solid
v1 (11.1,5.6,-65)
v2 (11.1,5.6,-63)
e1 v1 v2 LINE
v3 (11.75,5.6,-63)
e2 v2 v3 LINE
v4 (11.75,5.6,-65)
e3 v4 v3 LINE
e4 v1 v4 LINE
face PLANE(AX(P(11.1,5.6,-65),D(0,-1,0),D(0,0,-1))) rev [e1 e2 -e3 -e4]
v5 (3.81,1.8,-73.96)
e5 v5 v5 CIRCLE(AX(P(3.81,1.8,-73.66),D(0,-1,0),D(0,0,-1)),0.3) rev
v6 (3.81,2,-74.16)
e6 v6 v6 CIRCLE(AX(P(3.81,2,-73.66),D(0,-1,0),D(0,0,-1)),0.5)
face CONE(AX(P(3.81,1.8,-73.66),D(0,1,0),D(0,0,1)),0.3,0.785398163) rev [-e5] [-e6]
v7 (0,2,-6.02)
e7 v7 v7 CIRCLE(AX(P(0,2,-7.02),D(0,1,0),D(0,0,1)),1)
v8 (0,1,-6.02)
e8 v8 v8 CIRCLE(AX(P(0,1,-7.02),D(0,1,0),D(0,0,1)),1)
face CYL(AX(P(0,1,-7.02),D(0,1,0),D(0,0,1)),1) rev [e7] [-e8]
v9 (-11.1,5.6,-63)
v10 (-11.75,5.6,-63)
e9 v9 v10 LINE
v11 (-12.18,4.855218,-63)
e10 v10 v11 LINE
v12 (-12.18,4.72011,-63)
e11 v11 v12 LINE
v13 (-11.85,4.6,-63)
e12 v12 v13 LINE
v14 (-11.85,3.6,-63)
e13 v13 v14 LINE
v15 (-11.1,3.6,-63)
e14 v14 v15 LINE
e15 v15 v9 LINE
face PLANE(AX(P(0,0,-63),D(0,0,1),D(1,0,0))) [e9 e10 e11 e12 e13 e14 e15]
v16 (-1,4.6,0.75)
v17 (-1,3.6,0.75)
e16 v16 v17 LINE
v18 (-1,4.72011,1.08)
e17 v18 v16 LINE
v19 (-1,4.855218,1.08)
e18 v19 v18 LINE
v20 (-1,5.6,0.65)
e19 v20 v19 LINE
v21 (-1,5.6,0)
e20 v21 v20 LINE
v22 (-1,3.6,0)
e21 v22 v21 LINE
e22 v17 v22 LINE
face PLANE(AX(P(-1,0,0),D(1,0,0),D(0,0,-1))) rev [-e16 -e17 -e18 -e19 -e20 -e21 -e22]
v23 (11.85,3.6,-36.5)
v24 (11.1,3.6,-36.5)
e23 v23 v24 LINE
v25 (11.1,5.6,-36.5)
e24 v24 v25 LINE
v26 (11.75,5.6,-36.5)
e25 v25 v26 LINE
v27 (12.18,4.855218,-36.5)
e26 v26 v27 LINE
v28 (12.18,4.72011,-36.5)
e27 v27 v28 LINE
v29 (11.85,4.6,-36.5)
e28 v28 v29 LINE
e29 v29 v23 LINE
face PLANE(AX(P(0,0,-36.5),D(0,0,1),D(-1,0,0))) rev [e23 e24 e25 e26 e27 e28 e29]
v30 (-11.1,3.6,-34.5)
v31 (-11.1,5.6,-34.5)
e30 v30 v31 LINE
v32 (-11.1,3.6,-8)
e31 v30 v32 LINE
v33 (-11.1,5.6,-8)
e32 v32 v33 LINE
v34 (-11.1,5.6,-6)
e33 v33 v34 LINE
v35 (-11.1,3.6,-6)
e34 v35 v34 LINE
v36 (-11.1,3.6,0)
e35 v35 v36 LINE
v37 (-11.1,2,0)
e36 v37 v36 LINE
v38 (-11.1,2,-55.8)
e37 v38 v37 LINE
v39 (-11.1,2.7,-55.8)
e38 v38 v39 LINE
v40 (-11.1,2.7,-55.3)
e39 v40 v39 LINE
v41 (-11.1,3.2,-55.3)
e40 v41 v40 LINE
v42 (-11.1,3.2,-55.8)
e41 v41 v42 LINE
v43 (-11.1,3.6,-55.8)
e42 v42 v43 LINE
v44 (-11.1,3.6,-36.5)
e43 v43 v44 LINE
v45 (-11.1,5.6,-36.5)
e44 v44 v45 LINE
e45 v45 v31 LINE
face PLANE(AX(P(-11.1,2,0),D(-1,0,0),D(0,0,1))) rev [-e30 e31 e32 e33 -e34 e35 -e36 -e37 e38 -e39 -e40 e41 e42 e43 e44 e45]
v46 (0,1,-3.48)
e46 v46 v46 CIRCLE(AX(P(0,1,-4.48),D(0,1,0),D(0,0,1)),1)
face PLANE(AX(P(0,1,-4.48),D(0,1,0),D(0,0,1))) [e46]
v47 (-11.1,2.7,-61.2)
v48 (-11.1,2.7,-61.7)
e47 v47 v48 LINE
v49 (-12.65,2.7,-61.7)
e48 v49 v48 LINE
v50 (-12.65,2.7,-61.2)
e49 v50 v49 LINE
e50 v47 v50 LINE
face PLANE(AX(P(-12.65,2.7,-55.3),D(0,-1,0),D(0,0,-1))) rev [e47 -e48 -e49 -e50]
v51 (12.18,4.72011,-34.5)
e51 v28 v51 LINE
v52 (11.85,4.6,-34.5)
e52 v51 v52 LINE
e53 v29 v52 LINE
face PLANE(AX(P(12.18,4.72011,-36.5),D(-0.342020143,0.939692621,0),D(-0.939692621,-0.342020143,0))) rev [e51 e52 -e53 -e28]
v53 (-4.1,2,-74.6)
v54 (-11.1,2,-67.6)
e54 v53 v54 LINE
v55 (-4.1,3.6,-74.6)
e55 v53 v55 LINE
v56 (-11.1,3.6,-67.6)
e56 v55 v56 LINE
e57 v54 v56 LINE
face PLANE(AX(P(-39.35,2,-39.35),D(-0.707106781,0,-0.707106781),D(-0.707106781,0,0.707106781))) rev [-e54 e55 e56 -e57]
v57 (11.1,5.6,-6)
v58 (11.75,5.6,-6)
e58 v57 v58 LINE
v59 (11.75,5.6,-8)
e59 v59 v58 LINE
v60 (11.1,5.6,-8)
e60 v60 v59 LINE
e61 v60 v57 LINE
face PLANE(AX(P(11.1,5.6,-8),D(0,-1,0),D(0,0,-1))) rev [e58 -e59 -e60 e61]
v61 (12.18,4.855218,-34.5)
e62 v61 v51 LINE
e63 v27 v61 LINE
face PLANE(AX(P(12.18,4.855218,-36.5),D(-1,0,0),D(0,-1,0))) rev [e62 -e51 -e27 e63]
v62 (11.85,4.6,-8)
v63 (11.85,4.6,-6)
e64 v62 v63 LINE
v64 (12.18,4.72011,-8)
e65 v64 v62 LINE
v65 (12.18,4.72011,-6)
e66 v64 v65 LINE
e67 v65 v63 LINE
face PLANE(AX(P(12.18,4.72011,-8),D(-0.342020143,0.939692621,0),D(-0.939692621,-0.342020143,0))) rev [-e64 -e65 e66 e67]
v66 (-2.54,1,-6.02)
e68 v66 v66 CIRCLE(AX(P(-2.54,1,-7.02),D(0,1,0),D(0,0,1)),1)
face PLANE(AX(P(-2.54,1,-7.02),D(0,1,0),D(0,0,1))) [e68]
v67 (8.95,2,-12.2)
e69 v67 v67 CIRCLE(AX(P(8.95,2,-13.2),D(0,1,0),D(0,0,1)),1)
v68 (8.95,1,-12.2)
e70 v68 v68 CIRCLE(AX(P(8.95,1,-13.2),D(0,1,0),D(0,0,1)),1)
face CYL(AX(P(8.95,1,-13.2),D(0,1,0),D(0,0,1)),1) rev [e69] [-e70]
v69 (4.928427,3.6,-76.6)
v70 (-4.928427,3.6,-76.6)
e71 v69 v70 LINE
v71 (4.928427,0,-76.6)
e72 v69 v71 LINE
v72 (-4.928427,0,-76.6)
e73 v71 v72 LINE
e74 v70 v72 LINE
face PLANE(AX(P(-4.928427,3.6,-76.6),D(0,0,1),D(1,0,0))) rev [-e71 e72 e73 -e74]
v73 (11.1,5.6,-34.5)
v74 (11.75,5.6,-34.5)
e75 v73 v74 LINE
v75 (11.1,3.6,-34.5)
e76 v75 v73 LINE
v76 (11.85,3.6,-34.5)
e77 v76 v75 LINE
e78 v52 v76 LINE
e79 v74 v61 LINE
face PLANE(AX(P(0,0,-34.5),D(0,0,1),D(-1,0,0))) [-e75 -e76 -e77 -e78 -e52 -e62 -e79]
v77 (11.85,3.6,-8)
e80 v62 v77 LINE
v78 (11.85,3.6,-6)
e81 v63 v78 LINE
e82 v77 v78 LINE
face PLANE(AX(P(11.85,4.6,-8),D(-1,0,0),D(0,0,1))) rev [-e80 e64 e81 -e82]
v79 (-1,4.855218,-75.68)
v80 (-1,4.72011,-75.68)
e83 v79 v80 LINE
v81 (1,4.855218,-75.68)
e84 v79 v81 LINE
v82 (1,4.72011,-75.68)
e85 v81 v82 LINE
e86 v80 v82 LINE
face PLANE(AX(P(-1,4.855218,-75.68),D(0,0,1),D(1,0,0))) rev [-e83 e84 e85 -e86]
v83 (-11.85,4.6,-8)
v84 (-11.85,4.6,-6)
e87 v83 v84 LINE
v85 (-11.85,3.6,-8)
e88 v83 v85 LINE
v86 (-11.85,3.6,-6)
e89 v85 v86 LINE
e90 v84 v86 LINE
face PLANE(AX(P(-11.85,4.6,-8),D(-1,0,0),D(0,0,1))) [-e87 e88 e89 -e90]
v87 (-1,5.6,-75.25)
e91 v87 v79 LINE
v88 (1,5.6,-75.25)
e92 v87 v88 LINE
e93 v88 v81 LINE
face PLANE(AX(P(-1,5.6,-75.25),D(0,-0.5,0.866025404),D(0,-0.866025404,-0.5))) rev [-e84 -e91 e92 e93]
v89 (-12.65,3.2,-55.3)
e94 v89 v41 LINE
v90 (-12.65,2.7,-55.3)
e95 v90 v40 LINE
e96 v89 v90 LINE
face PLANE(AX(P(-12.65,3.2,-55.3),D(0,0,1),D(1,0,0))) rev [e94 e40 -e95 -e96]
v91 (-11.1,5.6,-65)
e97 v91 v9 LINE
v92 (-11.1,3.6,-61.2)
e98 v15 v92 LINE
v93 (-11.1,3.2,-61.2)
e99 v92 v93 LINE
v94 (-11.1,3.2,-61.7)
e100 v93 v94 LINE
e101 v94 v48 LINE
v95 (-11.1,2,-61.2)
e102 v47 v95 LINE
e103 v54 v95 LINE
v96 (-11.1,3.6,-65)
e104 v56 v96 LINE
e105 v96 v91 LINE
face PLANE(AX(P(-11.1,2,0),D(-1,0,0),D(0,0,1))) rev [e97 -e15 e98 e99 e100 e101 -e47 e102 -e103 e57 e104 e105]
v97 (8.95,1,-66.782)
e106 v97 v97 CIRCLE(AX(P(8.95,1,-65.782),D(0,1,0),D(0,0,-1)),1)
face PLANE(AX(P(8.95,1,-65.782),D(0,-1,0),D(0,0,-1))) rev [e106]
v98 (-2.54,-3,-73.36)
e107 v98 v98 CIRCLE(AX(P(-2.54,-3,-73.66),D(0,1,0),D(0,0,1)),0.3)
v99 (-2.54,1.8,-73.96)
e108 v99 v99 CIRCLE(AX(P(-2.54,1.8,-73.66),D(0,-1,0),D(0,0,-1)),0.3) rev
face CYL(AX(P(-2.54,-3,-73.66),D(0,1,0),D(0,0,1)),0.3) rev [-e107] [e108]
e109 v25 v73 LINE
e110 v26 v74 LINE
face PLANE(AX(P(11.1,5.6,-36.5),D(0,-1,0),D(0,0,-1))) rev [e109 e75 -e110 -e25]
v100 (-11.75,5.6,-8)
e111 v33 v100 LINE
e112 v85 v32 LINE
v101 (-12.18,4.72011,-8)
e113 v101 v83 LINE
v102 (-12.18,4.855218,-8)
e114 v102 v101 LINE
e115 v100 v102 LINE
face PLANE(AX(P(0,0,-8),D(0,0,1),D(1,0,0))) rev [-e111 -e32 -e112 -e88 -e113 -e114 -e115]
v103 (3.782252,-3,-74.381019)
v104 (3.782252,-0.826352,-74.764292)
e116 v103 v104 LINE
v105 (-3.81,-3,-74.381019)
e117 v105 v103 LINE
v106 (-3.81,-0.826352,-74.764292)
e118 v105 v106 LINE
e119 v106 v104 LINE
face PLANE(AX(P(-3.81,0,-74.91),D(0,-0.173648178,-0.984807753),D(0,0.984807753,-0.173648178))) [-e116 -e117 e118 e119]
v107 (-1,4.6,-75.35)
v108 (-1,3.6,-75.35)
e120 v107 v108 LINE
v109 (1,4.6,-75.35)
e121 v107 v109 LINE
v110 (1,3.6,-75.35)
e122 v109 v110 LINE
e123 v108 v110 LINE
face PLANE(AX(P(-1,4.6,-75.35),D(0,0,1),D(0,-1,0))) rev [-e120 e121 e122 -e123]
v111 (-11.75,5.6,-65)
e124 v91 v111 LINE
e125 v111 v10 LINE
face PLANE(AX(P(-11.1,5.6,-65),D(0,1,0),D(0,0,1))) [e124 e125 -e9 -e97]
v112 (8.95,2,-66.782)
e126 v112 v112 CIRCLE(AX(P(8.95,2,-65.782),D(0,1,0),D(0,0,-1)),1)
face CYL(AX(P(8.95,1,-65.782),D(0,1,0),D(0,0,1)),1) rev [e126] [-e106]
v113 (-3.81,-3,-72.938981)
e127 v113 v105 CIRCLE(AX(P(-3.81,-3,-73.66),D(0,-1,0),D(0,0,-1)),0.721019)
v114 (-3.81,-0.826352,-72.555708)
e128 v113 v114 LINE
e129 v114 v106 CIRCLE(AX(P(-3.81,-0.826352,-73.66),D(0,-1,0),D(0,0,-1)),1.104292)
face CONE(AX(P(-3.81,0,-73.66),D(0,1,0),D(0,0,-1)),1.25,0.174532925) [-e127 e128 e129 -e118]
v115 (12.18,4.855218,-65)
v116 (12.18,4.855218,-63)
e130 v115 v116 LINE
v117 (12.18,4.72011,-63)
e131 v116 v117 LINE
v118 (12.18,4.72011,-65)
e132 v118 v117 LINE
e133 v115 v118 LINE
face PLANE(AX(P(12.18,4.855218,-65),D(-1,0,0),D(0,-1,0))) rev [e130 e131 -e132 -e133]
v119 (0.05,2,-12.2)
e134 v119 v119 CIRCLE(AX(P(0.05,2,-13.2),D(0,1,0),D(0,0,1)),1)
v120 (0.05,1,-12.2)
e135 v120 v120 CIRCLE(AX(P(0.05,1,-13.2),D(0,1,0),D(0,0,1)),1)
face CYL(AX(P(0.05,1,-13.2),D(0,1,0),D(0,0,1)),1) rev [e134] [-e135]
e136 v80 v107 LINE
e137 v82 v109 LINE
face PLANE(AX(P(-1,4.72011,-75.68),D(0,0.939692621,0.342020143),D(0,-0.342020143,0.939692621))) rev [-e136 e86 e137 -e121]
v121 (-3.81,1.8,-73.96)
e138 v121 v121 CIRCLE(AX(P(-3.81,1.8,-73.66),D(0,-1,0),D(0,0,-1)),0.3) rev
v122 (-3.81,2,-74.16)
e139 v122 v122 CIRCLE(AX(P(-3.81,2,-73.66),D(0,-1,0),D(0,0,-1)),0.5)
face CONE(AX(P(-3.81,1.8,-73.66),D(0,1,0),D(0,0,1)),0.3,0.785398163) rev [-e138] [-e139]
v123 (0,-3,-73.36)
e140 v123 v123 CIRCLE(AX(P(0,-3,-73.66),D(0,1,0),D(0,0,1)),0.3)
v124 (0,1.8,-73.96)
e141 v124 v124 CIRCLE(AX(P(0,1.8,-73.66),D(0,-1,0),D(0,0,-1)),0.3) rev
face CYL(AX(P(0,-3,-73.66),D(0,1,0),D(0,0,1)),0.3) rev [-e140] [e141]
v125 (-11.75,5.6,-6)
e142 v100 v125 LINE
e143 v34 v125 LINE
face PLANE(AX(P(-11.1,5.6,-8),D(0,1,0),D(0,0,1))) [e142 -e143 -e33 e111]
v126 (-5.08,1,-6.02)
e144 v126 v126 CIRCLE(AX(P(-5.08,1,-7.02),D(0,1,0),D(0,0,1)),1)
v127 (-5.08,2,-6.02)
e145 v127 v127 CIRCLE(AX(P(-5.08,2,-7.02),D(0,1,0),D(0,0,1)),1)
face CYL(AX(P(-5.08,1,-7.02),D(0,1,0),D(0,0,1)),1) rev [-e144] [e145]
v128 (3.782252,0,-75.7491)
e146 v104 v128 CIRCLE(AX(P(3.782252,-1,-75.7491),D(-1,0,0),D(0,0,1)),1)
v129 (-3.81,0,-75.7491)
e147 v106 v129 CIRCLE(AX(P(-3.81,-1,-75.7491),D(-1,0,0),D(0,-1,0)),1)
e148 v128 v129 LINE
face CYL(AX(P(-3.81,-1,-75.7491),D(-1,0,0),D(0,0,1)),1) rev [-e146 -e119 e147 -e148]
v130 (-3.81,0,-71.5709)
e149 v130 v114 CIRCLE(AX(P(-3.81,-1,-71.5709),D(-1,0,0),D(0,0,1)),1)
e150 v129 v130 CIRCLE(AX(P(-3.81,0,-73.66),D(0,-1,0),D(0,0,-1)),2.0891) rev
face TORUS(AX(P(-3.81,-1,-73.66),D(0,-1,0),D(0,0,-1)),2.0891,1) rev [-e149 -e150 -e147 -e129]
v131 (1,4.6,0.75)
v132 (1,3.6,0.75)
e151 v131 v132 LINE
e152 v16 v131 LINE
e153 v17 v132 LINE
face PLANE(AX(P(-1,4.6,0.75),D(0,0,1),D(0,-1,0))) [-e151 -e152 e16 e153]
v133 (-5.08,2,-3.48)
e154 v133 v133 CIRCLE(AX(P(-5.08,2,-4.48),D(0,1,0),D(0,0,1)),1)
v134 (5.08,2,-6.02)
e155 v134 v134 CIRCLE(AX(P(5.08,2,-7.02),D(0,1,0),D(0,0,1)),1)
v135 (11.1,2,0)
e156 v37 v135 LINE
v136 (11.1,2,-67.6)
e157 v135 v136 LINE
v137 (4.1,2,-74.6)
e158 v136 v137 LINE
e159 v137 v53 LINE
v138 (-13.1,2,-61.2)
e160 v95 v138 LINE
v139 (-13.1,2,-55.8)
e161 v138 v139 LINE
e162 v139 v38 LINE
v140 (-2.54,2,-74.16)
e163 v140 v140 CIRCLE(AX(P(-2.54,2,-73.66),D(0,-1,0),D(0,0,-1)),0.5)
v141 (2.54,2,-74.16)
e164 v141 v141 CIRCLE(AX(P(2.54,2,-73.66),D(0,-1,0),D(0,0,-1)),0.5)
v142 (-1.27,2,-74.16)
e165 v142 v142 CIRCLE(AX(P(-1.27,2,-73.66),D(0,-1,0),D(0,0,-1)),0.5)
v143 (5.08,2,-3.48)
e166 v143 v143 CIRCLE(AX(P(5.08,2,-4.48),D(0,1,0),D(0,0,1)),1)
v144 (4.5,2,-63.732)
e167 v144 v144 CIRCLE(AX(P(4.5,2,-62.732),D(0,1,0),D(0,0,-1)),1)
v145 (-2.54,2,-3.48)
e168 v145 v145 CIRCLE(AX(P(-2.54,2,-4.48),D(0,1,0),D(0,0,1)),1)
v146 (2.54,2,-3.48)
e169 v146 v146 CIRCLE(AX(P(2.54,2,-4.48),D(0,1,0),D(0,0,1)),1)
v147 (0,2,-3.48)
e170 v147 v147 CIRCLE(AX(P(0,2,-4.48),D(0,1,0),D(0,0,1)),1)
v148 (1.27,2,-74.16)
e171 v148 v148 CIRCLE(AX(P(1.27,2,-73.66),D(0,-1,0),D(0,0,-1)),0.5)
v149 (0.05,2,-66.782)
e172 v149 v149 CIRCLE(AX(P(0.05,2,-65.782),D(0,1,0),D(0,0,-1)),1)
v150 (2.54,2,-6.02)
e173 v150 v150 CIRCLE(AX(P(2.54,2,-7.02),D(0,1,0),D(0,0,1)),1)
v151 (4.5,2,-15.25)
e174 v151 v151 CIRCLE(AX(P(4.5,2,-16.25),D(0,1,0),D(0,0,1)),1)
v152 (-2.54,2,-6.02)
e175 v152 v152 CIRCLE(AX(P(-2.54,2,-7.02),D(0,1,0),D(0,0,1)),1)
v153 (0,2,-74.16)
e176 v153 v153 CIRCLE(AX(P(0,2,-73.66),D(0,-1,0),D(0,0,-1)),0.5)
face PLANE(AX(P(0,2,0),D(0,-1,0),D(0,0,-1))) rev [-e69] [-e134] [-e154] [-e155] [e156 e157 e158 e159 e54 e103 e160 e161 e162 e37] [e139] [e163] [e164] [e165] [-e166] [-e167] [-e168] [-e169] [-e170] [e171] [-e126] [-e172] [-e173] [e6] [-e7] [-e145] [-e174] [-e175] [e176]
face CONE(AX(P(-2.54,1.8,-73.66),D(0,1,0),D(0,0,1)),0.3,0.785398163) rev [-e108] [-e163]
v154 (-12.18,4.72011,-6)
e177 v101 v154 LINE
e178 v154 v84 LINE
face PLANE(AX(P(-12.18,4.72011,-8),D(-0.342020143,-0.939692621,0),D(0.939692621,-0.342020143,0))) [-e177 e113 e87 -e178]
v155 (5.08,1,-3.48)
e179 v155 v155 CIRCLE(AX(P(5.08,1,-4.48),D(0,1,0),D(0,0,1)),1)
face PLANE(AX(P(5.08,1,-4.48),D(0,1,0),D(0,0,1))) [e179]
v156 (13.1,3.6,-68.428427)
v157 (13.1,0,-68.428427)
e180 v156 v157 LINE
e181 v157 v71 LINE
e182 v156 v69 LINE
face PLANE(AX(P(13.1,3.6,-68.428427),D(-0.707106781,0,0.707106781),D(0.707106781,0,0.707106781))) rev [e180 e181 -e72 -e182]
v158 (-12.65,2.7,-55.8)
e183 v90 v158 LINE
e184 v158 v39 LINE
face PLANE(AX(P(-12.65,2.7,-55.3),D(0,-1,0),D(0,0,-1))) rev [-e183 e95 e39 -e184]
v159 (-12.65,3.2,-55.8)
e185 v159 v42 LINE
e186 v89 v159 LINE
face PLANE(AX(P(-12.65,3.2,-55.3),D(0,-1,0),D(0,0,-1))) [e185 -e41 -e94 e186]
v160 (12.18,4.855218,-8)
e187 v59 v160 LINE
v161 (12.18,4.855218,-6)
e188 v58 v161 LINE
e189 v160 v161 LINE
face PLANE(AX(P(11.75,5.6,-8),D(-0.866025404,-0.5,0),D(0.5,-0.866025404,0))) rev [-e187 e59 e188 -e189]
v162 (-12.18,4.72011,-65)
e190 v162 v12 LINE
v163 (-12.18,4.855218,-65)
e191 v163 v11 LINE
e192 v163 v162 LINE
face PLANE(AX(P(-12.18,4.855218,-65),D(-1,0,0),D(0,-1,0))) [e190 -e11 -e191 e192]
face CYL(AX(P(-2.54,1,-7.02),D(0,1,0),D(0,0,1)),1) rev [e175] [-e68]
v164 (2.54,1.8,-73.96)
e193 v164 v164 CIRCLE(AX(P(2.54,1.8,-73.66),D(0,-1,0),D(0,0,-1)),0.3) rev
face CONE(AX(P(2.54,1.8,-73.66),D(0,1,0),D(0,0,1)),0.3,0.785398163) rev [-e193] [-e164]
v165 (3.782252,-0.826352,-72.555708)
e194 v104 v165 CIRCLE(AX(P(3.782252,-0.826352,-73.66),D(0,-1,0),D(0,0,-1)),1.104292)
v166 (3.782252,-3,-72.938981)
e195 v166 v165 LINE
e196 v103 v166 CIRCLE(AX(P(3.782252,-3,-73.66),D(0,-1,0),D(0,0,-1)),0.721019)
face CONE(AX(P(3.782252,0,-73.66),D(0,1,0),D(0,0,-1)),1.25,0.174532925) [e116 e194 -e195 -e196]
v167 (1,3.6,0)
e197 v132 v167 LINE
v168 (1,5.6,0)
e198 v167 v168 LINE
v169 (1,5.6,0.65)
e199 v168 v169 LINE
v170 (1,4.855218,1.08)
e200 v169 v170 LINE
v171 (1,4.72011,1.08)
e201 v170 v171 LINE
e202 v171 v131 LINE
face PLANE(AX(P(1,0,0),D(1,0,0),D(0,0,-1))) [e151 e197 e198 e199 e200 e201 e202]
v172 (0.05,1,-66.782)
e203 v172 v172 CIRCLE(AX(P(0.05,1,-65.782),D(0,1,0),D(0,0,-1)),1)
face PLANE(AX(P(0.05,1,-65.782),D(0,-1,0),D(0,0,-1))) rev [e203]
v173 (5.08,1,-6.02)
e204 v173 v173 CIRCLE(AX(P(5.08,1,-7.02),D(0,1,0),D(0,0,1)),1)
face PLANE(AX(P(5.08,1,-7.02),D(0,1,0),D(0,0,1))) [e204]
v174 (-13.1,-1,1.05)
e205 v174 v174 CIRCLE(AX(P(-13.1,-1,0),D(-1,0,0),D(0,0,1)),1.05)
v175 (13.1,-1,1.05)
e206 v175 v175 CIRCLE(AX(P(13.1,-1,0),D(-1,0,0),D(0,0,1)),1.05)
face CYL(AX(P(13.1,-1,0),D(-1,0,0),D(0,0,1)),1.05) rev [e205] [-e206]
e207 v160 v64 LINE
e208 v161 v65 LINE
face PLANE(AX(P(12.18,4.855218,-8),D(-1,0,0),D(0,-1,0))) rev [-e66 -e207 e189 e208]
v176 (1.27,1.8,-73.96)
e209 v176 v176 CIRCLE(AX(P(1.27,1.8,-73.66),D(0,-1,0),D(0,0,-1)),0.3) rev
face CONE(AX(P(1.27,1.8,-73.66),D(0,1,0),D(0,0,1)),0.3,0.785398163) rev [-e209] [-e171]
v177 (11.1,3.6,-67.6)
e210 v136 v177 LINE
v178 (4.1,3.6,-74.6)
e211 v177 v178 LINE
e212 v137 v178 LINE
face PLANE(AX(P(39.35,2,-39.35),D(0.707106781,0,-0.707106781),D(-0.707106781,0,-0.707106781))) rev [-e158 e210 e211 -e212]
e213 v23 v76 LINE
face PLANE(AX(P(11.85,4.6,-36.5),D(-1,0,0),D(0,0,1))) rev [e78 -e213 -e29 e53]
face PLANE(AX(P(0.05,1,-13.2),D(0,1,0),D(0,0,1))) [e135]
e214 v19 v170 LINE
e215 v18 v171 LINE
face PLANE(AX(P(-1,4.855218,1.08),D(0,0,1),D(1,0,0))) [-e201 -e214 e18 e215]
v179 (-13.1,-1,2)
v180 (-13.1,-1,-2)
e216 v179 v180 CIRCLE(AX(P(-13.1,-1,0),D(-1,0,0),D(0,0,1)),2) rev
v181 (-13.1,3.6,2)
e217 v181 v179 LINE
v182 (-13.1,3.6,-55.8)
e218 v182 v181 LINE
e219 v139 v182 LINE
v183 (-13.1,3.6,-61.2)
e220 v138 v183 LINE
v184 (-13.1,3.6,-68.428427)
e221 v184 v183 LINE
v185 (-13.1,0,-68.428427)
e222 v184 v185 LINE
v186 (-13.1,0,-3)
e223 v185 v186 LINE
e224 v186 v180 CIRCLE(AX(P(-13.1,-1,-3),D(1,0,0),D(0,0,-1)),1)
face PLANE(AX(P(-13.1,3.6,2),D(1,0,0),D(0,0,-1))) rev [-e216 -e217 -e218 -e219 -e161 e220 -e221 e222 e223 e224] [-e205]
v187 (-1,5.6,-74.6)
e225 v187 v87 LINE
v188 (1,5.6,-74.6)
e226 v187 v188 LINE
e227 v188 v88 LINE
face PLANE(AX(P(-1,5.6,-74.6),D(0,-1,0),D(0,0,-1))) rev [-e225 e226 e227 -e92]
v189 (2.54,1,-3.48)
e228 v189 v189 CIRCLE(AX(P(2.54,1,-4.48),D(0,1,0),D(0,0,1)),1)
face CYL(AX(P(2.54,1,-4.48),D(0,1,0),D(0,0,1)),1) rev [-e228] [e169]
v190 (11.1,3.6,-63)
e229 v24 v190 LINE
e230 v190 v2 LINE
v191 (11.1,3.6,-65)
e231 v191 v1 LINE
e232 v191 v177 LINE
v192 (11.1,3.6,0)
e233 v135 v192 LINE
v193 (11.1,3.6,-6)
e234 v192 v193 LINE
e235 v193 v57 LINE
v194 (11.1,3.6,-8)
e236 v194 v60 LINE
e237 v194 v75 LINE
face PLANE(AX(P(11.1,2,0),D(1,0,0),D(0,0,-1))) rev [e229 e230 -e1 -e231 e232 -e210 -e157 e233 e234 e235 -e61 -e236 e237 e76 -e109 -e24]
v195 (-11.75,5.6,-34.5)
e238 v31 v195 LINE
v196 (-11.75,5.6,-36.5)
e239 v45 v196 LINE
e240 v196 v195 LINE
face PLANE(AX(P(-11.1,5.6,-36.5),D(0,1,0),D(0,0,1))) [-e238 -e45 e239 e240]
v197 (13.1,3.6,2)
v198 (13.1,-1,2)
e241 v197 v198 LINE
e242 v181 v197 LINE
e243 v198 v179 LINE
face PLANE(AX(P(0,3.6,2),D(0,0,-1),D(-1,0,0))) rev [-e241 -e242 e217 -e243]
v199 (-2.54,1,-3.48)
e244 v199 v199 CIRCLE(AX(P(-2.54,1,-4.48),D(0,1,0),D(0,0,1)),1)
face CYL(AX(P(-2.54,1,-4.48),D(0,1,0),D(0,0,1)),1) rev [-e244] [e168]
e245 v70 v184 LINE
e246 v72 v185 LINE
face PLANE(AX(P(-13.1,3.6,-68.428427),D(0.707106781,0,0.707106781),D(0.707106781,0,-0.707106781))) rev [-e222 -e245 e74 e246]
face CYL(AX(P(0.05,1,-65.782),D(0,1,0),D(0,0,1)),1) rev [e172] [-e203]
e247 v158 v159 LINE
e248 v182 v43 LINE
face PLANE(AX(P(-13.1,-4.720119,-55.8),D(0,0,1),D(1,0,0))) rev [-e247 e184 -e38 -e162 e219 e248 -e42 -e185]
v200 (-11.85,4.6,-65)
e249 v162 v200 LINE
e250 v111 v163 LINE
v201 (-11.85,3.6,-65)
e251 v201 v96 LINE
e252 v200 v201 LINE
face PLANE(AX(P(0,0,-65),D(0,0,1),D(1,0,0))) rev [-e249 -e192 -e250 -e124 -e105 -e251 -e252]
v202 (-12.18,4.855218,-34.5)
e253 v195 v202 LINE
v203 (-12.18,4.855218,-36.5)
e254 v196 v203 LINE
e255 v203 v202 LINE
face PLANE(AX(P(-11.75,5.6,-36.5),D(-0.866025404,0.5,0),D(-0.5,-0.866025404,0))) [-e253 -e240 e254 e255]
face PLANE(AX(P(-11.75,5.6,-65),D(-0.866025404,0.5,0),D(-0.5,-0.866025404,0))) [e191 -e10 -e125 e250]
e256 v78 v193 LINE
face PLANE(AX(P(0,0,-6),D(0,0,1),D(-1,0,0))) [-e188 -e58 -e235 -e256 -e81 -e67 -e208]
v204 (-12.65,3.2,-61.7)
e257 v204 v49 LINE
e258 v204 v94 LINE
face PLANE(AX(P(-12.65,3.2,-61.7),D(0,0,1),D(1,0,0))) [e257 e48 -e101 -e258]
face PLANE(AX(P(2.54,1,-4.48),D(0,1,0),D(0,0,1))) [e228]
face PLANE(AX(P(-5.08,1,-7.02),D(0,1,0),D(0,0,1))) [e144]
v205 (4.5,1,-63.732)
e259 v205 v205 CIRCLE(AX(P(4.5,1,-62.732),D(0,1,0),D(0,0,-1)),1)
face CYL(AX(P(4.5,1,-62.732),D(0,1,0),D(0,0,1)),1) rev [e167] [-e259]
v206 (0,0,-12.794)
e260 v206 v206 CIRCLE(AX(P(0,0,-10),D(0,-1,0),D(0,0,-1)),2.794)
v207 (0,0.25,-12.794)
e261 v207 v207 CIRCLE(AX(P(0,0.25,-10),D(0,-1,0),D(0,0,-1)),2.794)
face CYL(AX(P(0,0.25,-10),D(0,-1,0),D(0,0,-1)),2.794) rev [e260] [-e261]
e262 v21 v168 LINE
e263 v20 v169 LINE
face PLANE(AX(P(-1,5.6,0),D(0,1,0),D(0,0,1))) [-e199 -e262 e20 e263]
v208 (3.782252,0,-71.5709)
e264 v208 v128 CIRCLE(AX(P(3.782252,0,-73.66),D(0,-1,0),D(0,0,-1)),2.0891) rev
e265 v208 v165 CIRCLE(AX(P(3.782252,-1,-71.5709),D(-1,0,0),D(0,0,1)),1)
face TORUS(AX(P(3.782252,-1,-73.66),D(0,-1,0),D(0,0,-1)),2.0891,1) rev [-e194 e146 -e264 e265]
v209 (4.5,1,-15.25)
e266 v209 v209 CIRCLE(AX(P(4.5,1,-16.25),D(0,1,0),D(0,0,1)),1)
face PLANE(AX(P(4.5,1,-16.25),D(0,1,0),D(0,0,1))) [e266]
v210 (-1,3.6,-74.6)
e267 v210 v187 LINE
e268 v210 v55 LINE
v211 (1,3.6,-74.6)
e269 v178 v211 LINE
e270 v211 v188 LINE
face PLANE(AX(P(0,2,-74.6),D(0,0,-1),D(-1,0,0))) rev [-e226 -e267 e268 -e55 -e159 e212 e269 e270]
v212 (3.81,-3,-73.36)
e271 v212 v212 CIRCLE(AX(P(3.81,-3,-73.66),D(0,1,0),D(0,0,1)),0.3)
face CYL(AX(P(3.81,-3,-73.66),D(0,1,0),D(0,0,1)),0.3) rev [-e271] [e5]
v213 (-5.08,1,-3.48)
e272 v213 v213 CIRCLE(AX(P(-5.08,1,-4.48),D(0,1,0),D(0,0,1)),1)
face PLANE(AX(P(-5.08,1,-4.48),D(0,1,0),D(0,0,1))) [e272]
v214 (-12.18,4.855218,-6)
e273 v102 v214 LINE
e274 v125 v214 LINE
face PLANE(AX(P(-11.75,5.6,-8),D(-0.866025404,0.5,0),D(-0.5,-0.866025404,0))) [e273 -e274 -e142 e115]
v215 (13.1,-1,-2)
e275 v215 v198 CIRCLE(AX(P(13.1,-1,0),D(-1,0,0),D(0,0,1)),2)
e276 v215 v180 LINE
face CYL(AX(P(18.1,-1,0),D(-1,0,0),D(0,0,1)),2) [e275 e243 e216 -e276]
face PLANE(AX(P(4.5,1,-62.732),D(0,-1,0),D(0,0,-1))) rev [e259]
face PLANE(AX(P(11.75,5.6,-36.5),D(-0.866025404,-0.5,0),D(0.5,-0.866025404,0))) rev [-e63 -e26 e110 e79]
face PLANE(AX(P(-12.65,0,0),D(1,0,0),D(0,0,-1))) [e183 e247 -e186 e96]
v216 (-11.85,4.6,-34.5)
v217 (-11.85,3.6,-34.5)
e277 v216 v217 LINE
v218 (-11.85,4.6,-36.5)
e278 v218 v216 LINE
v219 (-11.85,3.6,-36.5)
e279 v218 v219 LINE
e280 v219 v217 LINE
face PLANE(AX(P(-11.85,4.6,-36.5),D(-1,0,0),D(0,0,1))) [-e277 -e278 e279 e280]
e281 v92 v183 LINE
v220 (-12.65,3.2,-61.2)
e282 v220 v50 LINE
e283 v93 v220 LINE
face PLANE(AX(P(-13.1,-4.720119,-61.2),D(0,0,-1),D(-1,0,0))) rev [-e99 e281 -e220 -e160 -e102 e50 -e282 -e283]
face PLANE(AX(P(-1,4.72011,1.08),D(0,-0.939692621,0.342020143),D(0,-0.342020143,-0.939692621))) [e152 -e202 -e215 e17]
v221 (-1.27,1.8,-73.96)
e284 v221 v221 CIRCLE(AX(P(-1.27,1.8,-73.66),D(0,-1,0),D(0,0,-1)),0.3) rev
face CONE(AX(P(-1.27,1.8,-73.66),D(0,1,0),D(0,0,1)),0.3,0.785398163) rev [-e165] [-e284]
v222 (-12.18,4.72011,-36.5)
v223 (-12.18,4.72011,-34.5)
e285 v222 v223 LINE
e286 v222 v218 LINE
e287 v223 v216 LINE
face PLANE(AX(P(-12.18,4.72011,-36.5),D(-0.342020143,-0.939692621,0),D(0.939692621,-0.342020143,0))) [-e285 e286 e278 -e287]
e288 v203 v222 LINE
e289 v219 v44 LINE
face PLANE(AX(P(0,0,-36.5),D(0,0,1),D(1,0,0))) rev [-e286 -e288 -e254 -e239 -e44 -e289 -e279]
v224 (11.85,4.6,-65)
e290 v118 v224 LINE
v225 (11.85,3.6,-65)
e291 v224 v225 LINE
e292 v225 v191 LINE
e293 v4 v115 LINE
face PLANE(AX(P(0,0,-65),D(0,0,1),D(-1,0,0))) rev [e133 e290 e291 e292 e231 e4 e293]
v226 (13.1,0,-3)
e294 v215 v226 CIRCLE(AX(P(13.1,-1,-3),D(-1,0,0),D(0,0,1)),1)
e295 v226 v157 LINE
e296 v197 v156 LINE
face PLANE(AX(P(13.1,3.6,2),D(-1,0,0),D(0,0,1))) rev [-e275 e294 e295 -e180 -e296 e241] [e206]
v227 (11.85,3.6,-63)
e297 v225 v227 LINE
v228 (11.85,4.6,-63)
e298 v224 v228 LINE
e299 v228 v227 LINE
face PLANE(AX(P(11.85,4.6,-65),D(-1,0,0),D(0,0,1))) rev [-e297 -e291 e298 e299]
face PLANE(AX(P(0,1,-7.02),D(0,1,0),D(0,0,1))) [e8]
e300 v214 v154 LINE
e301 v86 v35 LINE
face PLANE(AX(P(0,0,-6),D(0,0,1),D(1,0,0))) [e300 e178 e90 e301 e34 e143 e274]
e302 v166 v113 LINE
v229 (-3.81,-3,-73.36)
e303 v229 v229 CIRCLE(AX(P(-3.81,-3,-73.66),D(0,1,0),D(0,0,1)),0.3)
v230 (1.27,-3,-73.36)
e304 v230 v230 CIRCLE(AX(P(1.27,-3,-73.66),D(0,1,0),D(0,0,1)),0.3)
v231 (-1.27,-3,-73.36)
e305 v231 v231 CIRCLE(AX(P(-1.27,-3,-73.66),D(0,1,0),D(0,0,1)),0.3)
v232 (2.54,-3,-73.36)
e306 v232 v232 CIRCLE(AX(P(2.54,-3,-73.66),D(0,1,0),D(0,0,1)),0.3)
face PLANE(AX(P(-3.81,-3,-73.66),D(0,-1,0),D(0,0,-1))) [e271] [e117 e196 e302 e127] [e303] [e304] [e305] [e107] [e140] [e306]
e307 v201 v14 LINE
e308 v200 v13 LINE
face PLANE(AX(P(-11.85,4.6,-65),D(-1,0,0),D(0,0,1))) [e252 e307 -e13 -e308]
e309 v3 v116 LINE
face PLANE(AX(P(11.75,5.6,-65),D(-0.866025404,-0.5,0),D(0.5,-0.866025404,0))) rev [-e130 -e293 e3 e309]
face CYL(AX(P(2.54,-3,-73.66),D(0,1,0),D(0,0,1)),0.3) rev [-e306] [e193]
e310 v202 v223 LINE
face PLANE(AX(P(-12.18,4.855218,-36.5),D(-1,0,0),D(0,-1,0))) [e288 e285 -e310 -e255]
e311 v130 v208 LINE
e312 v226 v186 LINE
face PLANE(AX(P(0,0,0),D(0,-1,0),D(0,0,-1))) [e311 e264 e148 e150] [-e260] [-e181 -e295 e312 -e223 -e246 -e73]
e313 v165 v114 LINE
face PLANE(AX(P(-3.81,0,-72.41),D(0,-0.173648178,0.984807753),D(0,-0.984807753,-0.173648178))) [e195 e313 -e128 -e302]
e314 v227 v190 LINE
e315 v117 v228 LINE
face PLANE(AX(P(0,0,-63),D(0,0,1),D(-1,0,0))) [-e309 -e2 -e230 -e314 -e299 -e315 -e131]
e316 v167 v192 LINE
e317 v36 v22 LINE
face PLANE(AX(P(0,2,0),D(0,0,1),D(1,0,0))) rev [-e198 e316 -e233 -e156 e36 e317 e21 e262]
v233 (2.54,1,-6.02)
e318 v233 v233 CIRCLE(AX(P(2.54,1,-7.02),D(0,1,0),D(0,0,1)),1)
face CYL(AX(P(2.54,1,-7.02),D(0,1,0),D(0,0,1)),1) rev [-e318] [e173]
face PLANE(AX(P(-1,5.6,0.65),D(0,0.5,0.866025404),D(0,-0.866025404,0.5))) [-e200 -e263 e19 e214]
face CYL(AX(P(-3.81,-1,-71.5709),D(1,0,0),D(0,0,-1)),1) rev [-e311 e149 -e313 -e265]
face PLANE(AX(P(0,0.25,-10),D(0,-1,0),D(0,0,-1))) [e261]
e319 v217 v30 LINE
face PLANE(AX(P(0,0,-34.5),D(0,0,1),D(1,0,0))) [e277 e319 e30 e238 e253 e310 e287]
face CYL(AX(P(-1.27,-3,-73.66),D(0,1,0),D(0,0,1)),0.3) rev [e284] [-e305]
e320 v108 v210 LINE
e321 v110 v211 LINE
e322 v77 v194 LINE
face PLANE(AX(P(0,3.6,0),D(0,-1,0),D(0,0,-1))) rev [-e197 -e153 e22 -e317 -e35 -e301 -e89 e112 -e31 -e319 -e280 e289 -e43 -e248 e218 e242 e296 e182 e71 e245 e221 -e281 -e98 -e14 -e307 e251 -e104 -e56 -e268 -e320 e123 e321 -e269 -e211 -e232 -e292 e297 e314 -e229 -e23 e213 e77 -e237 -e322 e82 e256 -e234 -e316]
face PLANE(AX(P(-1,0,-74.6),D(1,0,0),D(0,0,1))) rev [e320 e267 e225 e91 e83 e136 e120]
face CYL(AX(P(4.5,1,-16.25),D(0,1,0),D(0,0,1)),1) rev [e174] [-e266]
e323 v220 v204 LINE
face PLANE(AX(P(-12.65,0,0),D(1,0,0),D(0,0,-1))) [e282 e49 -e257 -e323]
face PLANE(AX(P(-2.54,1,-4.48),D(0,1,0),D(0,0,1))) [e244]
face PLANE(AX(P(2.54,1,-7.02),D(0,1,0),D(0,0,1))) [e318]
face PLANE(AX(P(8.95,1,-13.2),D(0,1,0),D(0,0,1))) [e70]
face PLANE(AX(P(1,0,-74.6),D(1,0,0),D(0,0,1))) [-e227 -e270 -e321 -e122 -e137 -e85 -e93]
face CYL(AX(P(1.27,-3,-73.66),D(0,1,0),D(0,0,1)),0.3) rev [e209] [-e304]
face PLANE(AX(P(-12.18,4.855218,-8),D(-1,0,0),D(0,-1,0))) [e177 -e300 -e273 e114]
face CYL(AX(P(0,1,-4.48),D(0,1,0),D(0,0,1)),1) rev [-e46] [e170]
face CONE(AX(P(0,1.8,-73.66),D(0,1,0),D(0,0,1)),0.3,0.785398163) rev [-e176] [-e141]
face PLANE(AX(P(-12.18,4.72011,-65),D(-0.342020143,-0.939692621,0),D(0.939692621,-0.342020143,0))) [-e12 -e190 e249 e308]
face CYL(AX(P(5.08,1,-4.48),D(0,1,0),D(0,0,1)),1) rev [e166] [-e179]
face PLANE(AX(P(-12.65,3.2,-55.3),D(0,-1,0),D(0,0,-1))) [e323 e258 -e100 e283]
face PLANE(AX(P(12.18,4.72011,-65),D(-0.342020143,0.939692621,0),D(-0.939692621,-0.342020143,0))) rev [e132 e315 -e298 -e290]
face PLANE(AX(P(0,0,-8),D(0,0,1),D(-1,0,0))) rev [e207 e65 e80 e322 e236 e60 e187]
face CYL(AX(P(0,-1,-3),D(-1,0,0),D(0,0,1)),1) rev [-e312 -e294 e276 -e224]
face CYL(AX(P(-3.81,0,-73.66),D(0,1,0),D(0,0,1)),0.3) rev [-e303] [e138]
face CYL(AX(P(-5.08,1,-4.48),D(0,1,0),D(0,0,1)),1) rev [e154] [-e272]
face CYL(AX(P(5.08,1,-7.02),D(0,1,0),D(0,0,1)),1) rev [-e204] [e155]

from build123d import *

# Parameters (mm, degrees)
BOSS_EXTRUDE1_DEPTH  = 3.6
CUT_EXTRUDE1_START   = 3.6
CUT_EXTRUDE1_DEPTH   = 1.6
SKETCH3_R            = 0.3
CUT_EXTRUDE2_DEPTH   = 78.737828629
BOSS_EXTRUDE3_DEPTH  = 3
BOSS_EXTRUDE3_TAPER  = 10
SKETCH3_2_R          = 0.3
CUT_EXTRUDE3_DEPTH   = 78.872780874
LPATTERN5_COUNT      = 7
LPATTERN5_PITCH      = 1.27
CHAMFER2_SIZE        = 0.2
FILLET2_R            = 1
BOSS_EXTRUDE4_DEPTH  = 26.2
SKETCH7_R            = 1.05
CUT_EXTRUDE4_DEPTH   = 82.036781772
SKETCH8_W            = 4
SKETCH8_H            = 5.4
CUT_EXTRUDE5_DEPTH   = 1.6
SKETCH9_R            = 1
CUT_EXTRUDE7_DEPTH   = 1
LPATTERN6_COUNT      = 5
LPATTERN6_PITCH      = 2.54
LPATTERN6_COUNT_DIR2 = 2
LPATTERN6_PITCH_DIR2 = 2.54
SKETCH10_R           = 1
CUT_EXTRUDE8_DEPTH   = 1
BOSS_EXTRUDE5_DEPTH  = 1
LPATTERN7_COUNT      = 3
LPATTERN7_PITCH      = 28.5
MIRROR1_COPY_1_DEPTH = 1
MIRROR1_COPY_2_DEPTH = 1
BOSS_EXTRUDE6_DEPTH  = 1
SKETCH14_W           = 6.4
SKETCH14_H           = 0.5
CUT_EXTRUDE9_DEPTH   = 1.55
FILLET3_R            = 1
SKETCH15_R           = 2.794
CUT_EXTRUDE10_DEPTH  = 0.25


with BuildPart() as part:
    # Sketch2 → Boss-Extrude1 (new body)
    with BuildSketch(Plane(origin=(0, 0, 0), x_dir=(1, 0, 0), z_dir=(0, 1, 0))):
        Polygon((0, -2), (-13.1, -2), (-13.1, 68.428427125), (-4.928427125, 76.6), (0, 76.6), (4.928427125, 76.6), (13.1, 68.428427125), (13.1, -2), align=None)
    extrude(amount=BOSS_EXTRUDE1_DEPTH)

    # Sketch1 → Cut-Extrude1 (cut)
    with BuildSketch(Plane(origin=(0, 0, 0), x_dir=(1, 0, 0), z_dir=(0, 1, 0)).offset(CUT_EXTRUDE1_START)):
        Polygon((0, 0), (-11.1, 0), (-11.1, 67.6), (-4.1, 74.6), (0, 74.6), (4.1, 74.6), (11.1, 67.6), (11.1, 0), align=None)
    extrude(amount=-CUT_EXTRUDE1_DEPTH, mode=Mode.SUBTRACT)

    # Sketch3 → Cut-Extrude2 (cut, through all)
    with BuildSketch(Plane(origin=(0, 2, 0), x_dir=(1, 0, 0), z_dir=(0, 1, 0))):
        with Locations(Location((-3.81, 73.66, 0), (0, 0, 270))):
            Circle(SKETCH3_R)
    extrude(amount=-CUT_EXTRUDE2_DEPTH, mode=Mode.SUBTRACT)

    # Sketch5 → Boss-Extrude3 (add)
    with BuildSketch(Plane(origin=(0, 0, 0), x_dir=(-1, 0, 0), z_dir=(0, -1, 0))):
        with BuildLine():
            ThreePointArc((3.81, 72.41), (5.06, 73.66), (3.81, 74.91))
            Line((3.81, 74.91), (-3.782252271, 74.91))
            ThreePointArc((-3.782252271, 74.91), (-5.032252271, 73.66), (-3.782252271, 72.41))
            Line((-3.782252271, 72.41), (3.81, 72.41))
        make_face()
    extrude(amount=BOSS_EXTRUDE3_DEPTH, taper=BOSS_EXTRUDE3_TAPER)

    # Sketch3<2> → Cut-Extrude3 (cut, through all)
    with BuildSketch(Plane(origin=(0, 2, 0), x_dir=(1, 0, 0), z_dir=(0, 1, 0))):
        with Locations(Location((-3.81, 73.66, 0), (0, 0, 270))):
            Circle(SKETCH3_2_R)
    cut_extrude3 = extrude(amount=-CUT_EXTRUDE3_DEPTH, mode=Mode.SUBTRACT)

    # LPattern5: Cut-Extrude3 ×7
    with Locations(*[(i * LPATTERN5_PITCH, 0, 0) for i in range(1, LPATTERN5_COUNT)]):
        add(cut_extrude3, mode=Mode.SUBTRACT)

    # Chamfer2
    chamfer2_edges = [part.edges().sort_by_distance(p)[0] for p in [
        (-3.81, 2, -73.96),
        (-2.54, 2, -73.96),
        (-1.27, 2, -73.96),
        (0, 2, -73.96),
        (1.27, 2, -73.96),
        (2.54, 2, -73.96),
        (3.81, 2, -73.96),
    ]]
    chamfer(chamfer2_edges, length=CHAMFER2_SIZE)

    # Fillet2
    fillet2_edges = [part.edges().sort_by_distance(p)[0] for p in [
        (-5.06, 0, -73.66),
        (-0.013873865, 0, -74.91),
        (5.032252271, 0, -73.66),
        (-0.013873865, 0, -72.41),
    ]]
    fillet(fillet2_edges, radius=FILLET2_R)

    # Sketch6 → Boss-Extrude4 (add)
    with BuildSketch(Plane.ZY.offset(13.1)):
        with BuildLine():
            Line((2, -1), (2, 0))
            Line((2, 0), (-2, 0))
            Line((-2, 0), (-2, -1))
            ThreePointArc((-2, -1), (0, -3), (2, -1))
        make_face()
    extrude(amount=-BOSS_EXTRUDE4_DEPTH)

    # Sketch7 → Cut-Extrude4 (cut, through all)
    with BuildSketch(Plane.ZY.offset(13.1)):
        with Locations((0, -1)):
            Circle(SKETCH7_R)
    extrude(amount=-CUT_EXTRUDE4_DEPTH, mode=Mode.SUBTRACT)

    # Sketch8 → Cut-Extrude5 (cut)
    with BuildSketch(Plane(origin=(0, 3.6, 0), x_dir=(1, 0, 0), z_dir=(0, 1, 0))):
        with Locations((-11.1, 58.5)):
            Rectangle(SKETCH8_W, SKETCH8_H)
    extrude(amount=-CUT_EXTRUDE5_DEPTH, mode=Mode.SUBTRACT)

    # Sketch9 → Cut-Extrude7 (cut)
    with BuildSketch(Plane(origin=(0, 2, 0), x_dir=(1, 0, 0), z_dir=(0, 1, 0))):
        with Locations(Location((-5.08, 4.48, 0), (0, 0, 270))):
            Circle(SKETCH9_R)
    cut_extrude7 = extrude(amount=-CUT_EXTRUDE7_DEPTH, mode=Mode.SUBTRACT)

    # LPattern6: Cut-Extrude7 5 × 2
    with Locations(*[(i * LPATTERN6_PITCH, 0, -j * LPATTERN6_PITCH_DIR2) for i in range(LPATTERN6_COUNT) for j in range(LPATTERN6_COUNT_DIR2) if (i, j) != (0, 0)]):
        add(cut_extrude7, mode=Mode.SUBTRACT)

    # Sketch10 → Cut-Extrude8 (cut)
    with BuildSketch(Plane(origin=(0, 2, 0), x_dir=(1, 0, 0), z_dir=(0, 1, 0))):
        with Locations(Location((0.05, 13.2, 0), (0, 0, 270))):
            Circle(SKETCH10_R)
        with Locations(Location((4.5, 16.25, 0), (0, 0, 270))):
            Circle(SKETCH10_R)
        with Locations(Location((8.95, 13.2, 0), (0, 0, 270))):
            Circle(SKETCH10_R)
        with Locations(Location((8.95, 65.782, 0), (0, 0, 90))):
            Circle(SKETCH10_R)
        with Locations(Location((4.5, 62.732, 0), (0, 0, 90))):
            Circle(SKETCH10_R)
        with Locations(Location((0.05, 65.782, 0), (0, 0, 90))):
            Circle(SKETCH10_R)
    extrude(amount=-CUT_EXTRUDE8_DEPTH, mode=Mode.SUBTRACT)

    # Sketch11 → Boss-Extrude5 (add, symmetric)
    with BuildSketch(Plane.XY.offset(-7)):
        Polygon((-11.1, 3.6), (-11.1, 5.6), (-11.75, 5.6), (-12.18, 4.855218153), (-12.18, 4.720110177), (-11.85, 4.6), (-11.85, 3.6), align=None)
    boss_extrude5 = extrude(amount=BOSS_EXTRUDE5_DEPTH, both=True)

    # LPattern7: Boss-Extrude5 ×3
    with Locations(*[(0, 0, -i * LPATTERN7_PITCH) for i in range(1, LPATTERN7_COUNT)]):
        add(boss_extrude5)

    # Mirror1: Boss-Extrude5 across plane
    add(boss_extrude5.mirror(Plane(origin=(0, 0, 0), x_dir=(0, 0, 1), z_dir=(1, 0, 0))))

    # Mirror1 copy 1 sketch → Mirror1 copy 1 (add, symmetric)
    with BuildSketch(Plane(origin=(0, 0, -35.5), x_dir=(-1, 0, 0), z_dir=(0, 0, 1))):
        Polygon((-11.1, -3.6), (-11.1, -5.6), (-11.75, -5.6), (-12.18, -4.855218153), (-12.18, -4.720110177), (-11.85, -4.6), (-11.85, -3.6), align=None)
    extrude(amount=MIRROR1_COPY_1_DEPTH, both=True)

    # Mirror1 copy 2 sketch → Mirror1 copy 2 (add, symmetric)
    with BuildSketch(Plane(origin=(0, 0, -64), x_dir=(-1, 0, 0), z_dir=(0, 0, 1))):
        Polygon((-11.1, -3.6), (-11.1, -5.6), (-11.75, -5.6), (-12.18, -4.855218153), (-12.18, -4.720110177), (-11.85, -4.6), (-11.85, -3.6), align=None)
    extrude(amount=MIRROR1_COPY_2_DEPTH, both=True)

    # Sketch13 → Boss-Extrude6 (add, symmetric)
    with BuildSketch(Plane(origin=(0, 0, 0), x_dir=(0, 0, -1), z_dir=(1, 0, 0))):
        Polygon((0, 3.6), (0, 5.6), (-0.65, 5.6), (-1.08, 4.855218153), (-1.08, 4.720110177), (-0.75, 4.6), (-0.75, 3.6), align=None)
    boss_extrude6 = extrude(amount=BOSS_EXTRUDE6_DEPTH, both=True)

    # Mirror2: Boss-Extrude6 across plane
    add(boss_extrude6.mirror(Plane.XY.offset(-37.3)))

    # Sketch14 → Cut-Extrude9 (cut)
    with BuildSketch(Plane(origin=(-11.1, 0, 0), x_dir=(0, 0, -1), z_dir=(1, 0, 0))):
        with Locations((58.5, 2.95)):
            Rectangle(SKETCH14_W, SKETCH14_H)
    extrude(amount=-CUT_EXTRUDE9_DEPTH, mode=Mode.SUBTRACT)

    # Fillet3
    fillet3_edges = [part.edges().sort_by_distance(p)[0] for p in [
        (0, 0, -2),
    ]]
    fillet(fillet3_edges, radius=FILLET3_R - 0.0001)  # a hair under: the kernel refuses the full size

    # Sketch15 → Cut-Extrude10 (cut)
    with BuildSketch(Plane.XZ):
        with Locations(Location((0, -10, 0), (0, 0, 270))):
            Circle(SKETCH15_R)
    extrude(amount=-CUT_EXTRUDE10_DEPTH, mode=Mode.SUBTRACT)


solid = part.part
